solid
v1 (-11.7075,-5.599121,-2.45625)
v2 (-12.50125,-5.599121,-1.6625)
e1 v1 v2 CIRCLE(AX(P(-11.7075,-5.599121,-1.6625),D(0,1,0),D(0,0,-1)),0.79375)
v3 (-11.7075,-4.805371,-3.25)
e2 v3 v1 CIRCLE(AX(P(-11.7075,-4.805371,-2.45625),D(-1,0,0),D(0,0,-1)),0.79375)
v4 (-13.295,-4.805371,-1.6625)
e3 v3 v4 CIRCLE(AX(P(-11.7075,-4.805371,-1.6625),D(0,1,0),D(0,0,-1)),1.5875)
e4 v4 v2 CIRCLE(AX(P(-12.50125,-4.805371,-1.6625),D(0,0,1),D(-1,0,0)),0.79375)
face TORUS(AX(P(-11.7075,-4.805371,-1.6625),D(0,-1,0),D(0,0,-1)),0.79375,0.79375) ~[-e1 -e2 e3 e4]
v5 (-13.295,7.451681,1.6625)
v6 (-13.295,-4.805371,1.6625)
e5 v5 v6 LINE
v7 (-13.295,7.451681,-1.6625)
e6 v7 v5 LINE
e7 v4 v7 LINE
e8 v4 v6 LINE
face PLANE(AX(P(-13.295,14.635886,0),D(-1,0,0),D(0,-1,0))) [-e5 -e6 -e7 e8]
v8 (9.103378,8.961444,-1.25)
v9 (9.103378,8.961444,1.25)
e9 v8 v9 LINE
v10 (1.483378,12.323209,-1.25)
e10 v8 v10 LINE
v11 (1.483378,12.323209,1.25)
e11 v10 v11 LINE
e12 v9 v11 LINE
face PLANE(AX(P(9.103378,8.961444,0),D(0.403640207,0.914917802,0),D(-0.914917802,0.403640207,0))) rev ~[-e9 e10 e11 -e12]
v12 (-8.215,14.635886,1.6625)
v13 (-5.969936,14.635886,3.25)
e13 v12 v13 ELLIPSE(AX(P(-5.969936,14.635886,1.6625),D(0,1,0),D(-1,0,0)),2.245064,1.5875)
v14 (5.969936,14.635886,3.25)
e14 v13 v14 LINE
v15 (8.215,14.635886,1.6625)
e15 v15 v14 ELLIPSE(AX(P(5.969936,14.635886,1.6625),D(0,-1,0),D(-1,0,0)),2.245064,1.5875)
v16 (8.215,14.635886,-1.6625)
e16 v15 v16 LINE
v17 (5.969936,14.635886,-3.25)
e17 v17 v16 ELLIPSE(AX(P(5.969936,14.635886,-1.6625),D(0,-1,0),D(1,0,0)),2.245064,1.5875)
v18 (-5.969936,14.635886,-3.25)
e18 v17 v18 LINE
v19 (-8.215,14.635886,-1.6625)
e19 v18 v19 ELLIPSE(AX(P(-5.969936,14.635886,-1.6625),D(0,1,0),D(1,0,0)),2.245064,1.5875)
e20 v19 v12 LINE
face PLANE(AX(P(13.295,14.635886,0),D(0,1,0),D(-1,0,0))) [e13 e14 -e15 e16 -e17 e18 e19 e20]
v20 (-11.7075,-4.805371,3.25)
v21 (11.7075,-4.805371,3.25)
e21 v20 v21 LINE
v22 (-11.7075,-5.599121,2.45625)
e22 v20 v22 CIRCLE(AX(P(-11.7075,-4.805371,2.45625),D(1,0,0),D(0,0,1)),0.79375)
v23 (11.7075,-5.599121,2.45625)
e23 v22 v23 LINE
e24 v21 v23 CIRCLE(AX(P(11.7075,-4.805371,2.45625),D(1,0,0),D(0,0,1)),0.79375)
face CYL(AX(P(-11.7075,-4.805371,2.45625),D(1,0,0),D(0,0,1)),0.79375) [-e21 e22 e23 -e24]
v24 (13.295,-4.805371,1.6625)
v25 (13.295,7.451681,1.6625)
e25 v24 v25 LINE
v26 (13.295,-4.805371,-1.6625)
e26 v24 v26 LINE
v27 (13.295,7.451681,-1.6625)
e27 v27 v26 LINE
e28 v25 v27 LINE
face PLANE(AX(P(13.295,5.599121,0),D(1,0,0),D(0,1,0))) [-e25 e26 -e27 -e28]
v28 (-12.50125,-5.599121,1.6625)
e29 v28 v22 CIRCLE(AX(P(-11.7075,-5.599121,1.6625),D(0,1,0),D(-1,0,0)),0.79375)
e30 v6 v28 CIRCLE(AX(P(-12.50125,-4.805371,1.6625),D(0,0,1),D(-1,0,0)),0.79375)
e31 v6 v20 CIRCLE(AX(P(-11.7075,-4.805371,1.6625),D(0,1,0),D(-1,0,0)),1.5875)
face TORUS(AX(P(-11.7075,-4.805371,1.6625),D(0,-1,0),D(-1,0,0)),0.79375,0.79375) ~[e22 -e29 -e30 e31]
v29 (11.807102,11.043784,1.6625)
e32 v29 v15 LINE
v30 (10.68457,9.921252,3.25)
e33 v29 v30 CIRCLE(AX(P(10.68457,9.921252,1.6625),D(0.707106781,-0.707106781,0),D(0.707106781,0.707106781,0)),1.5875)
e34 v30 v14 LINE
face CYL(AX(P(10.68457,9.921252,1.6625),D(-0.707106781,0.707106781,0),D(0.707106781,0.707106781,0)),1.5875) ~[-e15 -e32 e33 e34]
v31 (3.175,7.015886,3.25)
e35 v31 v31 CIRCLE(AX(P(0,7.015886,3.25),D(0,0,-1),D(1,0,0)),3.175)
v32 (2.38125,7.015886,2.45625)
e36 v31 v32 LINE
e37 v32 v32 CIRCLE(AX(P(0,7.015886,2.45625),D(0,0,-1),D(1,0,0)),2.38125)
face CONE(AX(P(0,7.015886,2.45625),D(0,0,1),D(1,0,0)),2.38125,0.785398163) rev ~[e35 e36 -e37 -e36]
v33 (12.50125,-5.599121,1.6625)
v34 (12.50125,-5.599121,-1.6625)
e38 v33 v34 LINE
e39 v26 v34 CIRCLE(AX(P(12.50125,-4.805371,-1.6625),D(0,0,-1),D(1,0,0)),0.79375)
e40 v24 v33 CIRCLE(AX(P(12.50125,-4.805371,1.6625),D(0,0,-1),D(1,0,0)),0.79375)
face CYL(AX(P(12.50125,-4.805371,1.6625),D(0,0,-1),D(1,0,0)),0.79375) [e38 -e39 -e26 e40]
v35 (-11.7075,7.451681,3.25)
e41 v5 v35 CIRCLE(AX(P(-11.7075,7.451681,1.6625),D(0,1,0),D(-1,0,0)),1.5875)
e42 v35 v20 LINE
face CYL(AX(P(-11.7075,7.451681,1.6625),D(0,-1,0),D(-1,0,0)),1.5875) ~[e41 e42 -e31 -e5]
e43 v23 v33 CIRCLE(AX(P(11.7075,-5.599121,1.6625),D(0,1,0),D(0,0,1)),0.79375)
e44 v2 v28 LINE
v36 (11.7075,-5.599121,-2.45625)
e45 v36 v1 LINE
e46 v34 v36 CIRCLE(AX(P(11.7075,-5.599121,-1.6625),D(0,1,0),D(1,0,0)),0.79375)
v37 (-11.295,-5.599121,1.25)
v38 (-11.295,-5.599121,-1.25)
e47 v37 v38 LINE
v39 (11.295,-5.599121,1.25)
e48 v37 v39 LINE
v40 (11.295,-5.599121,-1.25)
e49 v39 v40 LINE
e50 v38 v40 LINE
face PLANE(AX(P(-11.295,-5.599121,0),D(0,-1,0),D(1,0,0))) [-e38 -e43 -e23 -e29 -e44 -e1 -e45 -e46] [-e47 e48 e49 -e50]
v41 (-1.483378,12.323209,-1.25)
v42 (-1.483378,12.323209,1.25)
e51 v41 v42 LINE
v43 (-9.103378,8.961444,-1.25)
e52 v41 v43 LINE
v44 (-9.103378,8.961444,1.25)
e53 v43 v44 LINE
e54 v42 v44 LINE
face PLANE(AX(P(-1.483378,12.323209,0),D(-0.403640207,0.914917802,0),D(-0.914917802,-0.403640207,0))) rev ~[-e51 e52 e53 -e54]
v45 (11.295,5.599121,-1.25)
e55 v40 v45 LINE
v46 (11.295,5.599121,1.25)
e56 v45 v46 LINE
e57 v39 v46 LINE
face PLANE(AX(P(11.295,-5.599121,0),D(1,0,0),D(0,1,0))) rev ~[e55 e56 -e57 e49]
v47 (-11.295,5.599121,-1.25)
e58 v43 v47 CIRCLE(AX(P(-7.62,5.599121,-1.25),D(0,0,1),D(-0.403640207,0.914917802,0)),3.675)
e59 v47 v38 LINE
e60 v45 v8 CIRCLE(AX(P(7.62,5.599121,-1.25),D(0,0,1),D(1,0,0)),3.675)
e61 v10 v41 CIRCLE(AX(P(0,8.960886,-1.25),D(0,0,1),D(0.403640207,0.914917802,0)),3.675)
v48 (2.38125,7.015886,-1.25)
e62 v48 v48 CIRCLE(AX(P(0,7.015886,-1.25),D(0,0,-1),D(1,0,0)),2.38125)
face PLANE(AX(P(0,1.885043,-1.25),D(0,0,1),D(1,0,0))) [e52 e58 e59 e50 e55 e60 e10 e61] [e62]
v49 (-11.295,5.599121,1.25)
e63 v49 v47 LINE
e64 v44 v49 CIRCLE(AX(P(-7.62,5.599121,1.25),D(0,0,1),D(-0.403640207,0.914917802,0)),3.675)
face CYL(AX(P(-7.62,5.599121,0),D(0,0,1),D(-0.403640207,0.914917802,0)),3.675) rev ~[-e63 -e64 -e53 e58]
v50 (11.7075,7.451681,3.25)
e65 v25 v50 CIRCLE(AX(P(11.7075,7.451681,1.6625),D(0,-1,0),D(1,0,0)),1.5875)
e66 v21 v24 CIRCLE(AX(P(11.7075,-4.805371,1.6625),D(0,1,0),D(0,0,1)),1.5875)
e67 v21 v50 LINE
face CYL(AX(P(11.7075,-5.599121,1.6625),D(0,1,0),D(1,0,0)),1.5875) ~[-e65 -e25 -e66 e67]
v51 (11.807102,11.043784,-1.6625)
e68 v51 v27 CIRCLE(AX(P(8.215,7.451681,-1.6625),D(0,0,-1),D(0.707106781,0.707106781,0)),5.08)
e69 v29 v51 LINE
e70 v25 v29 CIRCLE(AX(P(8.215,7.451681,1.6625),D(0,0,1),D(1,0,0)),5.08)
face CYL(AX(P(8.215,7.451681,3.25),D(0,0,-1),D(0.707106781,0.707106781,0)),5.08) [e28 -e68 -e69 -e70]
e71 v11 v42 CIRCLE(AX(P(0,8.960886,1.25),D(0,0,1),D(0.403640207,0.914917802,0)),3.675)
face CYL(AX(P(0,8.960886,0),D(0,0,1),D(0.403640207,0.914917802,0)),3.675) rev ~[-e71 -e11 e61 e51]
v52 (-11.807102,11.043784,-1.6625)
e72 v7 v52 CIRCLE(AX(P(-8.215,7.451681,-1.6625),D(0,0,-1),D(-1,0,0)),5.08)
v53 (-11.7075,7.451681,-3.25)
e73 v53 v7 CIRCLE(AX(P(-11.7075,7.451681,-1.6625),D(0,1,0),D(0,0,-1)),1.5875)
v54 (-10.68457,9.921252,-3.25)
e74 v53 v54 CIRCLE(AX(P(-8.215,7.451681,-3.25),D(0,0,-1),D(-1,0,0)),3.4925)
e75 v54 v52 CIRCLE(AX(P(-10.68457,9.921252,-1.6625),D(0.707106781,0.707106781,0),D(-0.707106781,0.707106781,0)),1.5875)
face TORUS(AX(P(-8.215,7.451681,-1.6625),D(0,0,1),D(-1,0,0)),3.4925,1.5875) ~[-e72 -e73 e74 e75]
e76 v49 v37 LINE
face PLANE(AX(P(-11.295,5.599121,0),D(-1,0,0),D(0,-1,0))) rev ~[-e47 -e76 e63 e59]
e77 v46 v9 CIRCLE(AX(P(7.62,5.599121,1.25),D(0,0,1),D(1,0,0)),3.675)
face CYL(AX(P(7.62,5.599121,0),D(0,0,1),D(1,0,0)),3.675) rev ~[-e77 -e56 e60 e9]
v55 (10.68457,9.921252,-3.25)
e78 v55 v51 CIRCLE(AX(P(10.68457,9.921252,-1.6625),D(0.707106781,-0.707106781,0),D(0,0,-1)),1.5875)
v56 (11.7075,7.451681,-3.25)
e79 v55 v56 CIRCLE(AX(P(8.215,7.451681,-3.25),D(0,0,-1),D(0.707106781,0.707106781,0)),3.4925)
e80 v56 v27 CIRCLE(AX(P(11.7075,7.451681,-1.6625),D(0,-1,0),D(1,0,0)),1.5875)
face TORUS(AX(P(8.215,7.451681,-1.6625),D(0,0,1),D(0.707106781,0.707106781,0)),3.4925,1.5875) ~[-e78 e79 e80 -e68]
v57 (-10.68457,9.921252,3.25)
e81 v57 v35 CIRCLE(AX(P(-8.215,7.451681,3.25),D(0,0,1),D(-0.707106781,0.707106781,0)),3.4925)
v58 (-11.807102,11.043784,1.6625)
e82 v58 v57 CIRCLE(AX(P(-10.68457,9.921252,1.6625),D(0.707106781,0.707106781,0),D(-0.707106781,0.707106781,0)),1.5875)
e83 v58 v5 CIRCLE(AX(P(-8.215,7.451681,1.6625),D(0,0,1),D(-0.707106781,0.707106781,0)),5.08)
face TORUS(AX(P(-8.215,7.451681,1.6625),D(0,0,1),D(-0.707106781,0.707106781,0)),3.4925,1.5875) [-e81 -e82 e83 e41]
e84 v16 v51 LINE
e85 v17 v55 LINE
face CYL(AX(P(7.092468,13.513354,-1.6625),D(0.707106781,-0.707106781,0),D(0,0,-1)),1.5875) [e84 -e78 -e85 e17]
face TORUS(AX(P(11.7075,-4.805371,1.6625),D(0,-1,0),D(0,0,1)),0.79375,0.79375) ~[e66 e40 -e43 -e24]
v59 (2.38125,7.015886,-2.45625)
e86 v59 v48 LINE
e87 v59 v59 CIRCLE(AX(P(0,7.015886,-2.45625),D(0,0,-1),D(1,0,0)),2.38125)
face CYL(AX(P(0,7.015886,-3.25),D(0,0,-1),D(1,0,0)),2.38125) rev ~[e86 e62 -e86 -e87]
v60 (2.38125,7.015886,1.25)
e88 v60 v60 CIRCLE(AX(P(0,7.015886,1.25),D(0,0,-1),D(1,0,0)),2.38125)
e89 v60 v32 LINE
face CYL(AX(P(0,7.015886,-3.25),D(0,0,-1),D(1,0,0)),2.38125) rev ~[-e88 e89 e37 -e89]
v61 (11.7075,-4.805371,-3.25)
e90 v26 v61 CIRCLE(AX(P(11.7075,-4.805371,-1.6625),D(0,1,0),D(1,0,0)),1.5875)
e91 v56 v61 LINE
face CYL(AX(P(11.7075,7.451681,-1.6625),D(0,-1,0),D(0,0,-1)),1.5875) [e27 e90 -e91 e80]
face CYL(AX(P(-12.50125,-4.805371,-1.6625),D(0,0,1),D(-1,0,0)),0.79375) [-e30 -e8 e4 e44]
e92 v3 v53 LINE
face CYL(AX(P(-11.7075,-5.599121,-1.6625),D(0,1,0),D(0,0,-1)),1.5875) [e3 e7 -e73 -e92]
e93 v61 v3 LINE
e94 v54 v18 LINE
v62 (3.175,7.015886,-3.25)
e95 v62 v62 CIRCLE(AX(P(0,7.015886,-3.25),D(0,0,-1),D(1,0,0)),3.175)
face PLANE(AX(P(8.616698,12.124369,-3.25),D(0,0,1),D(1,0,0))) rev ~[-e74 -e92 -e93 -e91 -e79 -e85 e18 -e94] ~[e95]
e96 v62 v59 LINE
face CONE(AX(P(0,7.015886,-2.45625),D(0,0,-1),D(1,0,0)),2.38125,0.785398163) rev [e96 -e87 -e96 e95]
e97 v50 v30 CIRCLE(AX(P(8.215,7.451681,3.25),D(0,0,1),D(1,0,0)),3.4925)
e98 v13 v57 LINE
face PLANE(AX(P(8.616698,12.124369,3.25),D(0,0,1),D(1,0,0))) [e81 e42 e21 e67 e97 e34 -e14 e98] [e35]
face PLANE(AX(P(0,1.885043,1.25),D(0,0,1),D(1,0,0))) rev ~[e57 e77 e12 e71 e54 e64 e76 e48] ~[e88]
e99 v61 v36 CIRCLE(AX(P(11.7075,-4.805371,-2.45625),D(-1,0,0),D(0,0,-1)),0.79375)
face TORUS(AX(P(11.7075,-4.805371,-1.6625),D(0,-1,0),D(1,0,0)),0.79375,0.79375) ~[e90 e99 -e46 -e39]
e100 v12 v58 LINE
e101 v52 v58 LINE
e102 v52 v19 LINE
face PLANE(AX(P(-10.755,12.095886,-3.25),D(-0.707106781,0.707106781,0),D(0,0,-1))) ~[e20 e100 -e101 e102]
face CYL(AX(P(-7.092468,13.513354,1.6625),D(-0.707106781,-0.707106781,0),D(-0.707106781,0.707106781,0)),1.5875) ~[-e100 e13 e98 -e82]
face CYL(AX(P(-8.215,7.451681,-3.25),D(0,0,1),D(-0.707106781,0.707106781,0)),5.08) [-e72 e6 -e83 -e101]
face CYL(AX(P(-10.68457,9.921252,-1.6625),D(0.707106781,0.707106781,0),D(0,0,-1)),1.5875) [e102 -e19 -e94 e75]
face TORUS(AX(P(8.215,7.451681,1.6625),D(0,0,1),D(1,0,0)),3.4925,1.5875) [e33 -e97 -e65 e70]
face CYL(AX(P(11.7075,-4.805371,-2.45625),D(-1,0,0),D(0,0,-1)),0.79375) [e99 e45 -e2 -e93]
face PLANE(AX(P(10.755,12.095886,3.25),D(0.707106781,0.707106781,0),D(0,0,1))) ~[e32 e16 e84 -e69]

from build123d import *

# Parameters (mm, degrees)
F1_DEPTH = 1.25
F2_T     = 2
F3_R     = 2.38125
F4_DEPTH = 6.501
F6_DEPTH = 3.25
F7_SIZE  = 5.08
F8_R     = 5.08
F9_R     = 1.5875
F10_SIZE = 0.79375
F11_R    = 0.79375


with BuildPart() as f1:
    # F0 (on Top) → F1 (new body, symmetric)
    with BuildSketch(Plane.XY):
        with BuildLine():
            ThreePointArc((1.2815576559, 11.8657501741), (0, 12.1358861541), (-1.2815576559, 11.8657501741))
            Line((-1.2815576559, 11.8657501741), (-8.9015576559, 8.5039854683))
            ThreePointArc((-8.9015576559, 8.5039854683), (-10.2798468525, 7.3328572186), (-10.795, 5.5991214483))
            Line((-10.795, 5.5991214483), (-10.795, -5.5991214483))
            Line((-10.795, -5.5991214483), (10.795, -5.5991214483))
            Line((10.795, -5.5991214483), (10.795, 5.5991214483))
            ThreePointArc((10.795, 5.5991214483), (10.2798468525, 7.3328572186), (8.9015576559, 8.5039854683))
            Line((8.9015576559, 8.5039854683), (1.2815576559, 11.8657501741))
        make_face()
        with BuildLine():
            Line((-8.9015576559, 8.5039854683), (-1.2815576559, 11.8657501741))
            ThreePointArc((-1.2815576559, 11.8657501741), (0, 12.1358861541), (1.2815576559, 11.8657501741))
            Line((1.2815576559, 11.8657501741), (8.9015576559, 8.5039854683))
            ThreePointArc((8.9015576559, 8.5039854683), (10.2798468525, 7.3328572186), (10.795, 5.5991214483))
            Line((10.795, 5.5991214483), (10.795, -5.5991214483))
            Line((10.795, -5.5991214483), (11.295, -5.5991214483))
            Line((11.295, -5.5991214483), (11.295, 5.5991214483))
            ThreePointArc((11.295, 5.5991214483), (10.6987203726, 7.6058864738), (9.1033777592, 8.961444369))
            Line((9.1033777592, 8.961444369), (1.4833777592, 12.3232090749))
            ThreePointArc((1.4833777592, 12.3232090749), (0, 12.6358861541), (-1.4833777592, 12.3232090749))
            Line((-1.4833777592, 12.3232090749), (-9.1033777592, 8.961444369))
            ThreePointArc((-9.1033777592, 8.961444369), (-10.6987203726, 7.6058864738), (-11.295, 5.5991214483))
            Line((-11.295, 5.5991214483), (-11.295, -5.5991214483))
            Line((-11.295, -5.5991214483), (-10.795, -5.5991214483))
            Line((-10.795, -5.5991214483), (-10.795, 5.5991214483))
            ThreePointArc((-10.795, 5.5991214483), (-10.2798468525, 7.3328572186), (-8.9015576559, 8.5039854683))
        make_face()
    extrude(amount=F1_DEPTH, both=True)

    # F2
    f2_openings = [f1.faces().sort_by_distance(p)[0] for p in [
        (0, -5.599121, 0),
    ]]
    offset(amount=F2_T, openings=f2_openings, kind=Kind.INTERSECTION)

    # F3 (on face) → F4 (cut, through all)
    with BuildSketch(Plane(origin=(0, 0, -3.25), x_dir=(1, 0, 0), z_dir=(0, 0, -1))):
        with Locations((0, -7.0158861541)):
            Circle(F3_R)
    extrude(amount=-F4_DEPTH, mode=Mode.SUBTRACT)

    # F5 (on Top) → F6 (join, symmetric)
    with BuildSketch(Plane.XY):
        with BuildLine():
            Line((-9.9106581723, 10.7912799722), (-2.2906581723, 14.1530446781))
            ThreePointArc((-2.2906581723, 14.1530446781), (-1.1704967699, 14.5138639419), (0, 14.6358861541))
            Line((0, 14.6358861541), (-13.295, 14.6358861541))
            Line((-13.295, 14.6358861541), (-13.295, 5.5991214483))
            ThreePointArc((-13.295, 5.5991214483), (-12.3742144529, 8.6980034944), (-9.9106581723, 10.7912799722))
        make_face()
        with BuildLine():
            Line((13.295, 14.6358861541), (0, 14.6358861541))
            ThreePointArc((0, 14.6358861541), (1.1704967699, 14.5138639419), (2.2906581723, 14.1530446781))
            Line((2.2906581723, 14.1530446781), (9.9106581723, 10.7912799722))
            ThreePointArc((9.9106581723, 10.7912799722), (12.3742144529, 8.6980034944), (13.295, 5.5991214483))
            Line((13.295, 5.5991214483), (13.295, 14.6358861541))
        make_face()
    extrude(amount=F6_DEPTH, both=True)

    # F7
    f7_edges = [f1.edges().sort_by_distance(p)[0] for p in [
        (-13.295, 14.635886, 0),
        (13.295, 14.635886, 0),
    ]]
    chamfer(f7_edges, length=F7_SIZE)

    # F8
    f8_edges = [f1.edges().sort_by_distance(p)[0] for p in [
        (-13.295, 9.555886, 0),
        (13.295, 9.555886, 0),
    ]]
    fillet(f8_edges, radius=F8_R)

    # F9
    f9_edges = [f1.edges().sort_by_distance(p)[0] for p in [
        (-13.295, 0.92628, -3.25),
        (-13.295, 0.92628, 3.25),
        (13.295, 0.92628, 3.25),
        (13.295, 0.92628, -3.25),
        (12.908308, 9.395713, -3.25),
        (10.011051, 12.839835, -3.25),
        (-12.908308, 9.395713, -3.25),
        (-10.011051, 12.839835, -3.25),
        (12.908308, 9.395713, 3.25),
        (10.011051, 12.839835, 3.25),
        (-12.908308, 9.395713, 3.25),
        (-10.011051, 12.839835, 3.25),
    ]]
    fillet(f9_edges, radius=F9_R)

    # F10
    f10_edges = [f1.edges().sort_by_distance(p)[0] for p in [
        (-2.38125, 7.015886, -3.25),
        (-2.38125, 7.015886, 3.25),
    ]]
    chamfer(f10_edges, length=F10_SIZE)

    # F11
    f11_edges = [f1.edges().sort_by_distance(p)[0] for p in [
        (0, -5.599121, -3.25),
        (0, -5.599121, 3.25),
        (12.830032, -5.599121, 2.785032),
        (-12.830032, -5.599121, 2.785032),
        (13.295, -5.599121, 0),
        (-13.295, -5.599121, 0),
        (12.830032, -5.599121, -2.785032),
        (-12.830032, -5.599121, -2.785032),
    ]]
    fillet(f11_edges, radius=F11_R)


solid = f1.part
